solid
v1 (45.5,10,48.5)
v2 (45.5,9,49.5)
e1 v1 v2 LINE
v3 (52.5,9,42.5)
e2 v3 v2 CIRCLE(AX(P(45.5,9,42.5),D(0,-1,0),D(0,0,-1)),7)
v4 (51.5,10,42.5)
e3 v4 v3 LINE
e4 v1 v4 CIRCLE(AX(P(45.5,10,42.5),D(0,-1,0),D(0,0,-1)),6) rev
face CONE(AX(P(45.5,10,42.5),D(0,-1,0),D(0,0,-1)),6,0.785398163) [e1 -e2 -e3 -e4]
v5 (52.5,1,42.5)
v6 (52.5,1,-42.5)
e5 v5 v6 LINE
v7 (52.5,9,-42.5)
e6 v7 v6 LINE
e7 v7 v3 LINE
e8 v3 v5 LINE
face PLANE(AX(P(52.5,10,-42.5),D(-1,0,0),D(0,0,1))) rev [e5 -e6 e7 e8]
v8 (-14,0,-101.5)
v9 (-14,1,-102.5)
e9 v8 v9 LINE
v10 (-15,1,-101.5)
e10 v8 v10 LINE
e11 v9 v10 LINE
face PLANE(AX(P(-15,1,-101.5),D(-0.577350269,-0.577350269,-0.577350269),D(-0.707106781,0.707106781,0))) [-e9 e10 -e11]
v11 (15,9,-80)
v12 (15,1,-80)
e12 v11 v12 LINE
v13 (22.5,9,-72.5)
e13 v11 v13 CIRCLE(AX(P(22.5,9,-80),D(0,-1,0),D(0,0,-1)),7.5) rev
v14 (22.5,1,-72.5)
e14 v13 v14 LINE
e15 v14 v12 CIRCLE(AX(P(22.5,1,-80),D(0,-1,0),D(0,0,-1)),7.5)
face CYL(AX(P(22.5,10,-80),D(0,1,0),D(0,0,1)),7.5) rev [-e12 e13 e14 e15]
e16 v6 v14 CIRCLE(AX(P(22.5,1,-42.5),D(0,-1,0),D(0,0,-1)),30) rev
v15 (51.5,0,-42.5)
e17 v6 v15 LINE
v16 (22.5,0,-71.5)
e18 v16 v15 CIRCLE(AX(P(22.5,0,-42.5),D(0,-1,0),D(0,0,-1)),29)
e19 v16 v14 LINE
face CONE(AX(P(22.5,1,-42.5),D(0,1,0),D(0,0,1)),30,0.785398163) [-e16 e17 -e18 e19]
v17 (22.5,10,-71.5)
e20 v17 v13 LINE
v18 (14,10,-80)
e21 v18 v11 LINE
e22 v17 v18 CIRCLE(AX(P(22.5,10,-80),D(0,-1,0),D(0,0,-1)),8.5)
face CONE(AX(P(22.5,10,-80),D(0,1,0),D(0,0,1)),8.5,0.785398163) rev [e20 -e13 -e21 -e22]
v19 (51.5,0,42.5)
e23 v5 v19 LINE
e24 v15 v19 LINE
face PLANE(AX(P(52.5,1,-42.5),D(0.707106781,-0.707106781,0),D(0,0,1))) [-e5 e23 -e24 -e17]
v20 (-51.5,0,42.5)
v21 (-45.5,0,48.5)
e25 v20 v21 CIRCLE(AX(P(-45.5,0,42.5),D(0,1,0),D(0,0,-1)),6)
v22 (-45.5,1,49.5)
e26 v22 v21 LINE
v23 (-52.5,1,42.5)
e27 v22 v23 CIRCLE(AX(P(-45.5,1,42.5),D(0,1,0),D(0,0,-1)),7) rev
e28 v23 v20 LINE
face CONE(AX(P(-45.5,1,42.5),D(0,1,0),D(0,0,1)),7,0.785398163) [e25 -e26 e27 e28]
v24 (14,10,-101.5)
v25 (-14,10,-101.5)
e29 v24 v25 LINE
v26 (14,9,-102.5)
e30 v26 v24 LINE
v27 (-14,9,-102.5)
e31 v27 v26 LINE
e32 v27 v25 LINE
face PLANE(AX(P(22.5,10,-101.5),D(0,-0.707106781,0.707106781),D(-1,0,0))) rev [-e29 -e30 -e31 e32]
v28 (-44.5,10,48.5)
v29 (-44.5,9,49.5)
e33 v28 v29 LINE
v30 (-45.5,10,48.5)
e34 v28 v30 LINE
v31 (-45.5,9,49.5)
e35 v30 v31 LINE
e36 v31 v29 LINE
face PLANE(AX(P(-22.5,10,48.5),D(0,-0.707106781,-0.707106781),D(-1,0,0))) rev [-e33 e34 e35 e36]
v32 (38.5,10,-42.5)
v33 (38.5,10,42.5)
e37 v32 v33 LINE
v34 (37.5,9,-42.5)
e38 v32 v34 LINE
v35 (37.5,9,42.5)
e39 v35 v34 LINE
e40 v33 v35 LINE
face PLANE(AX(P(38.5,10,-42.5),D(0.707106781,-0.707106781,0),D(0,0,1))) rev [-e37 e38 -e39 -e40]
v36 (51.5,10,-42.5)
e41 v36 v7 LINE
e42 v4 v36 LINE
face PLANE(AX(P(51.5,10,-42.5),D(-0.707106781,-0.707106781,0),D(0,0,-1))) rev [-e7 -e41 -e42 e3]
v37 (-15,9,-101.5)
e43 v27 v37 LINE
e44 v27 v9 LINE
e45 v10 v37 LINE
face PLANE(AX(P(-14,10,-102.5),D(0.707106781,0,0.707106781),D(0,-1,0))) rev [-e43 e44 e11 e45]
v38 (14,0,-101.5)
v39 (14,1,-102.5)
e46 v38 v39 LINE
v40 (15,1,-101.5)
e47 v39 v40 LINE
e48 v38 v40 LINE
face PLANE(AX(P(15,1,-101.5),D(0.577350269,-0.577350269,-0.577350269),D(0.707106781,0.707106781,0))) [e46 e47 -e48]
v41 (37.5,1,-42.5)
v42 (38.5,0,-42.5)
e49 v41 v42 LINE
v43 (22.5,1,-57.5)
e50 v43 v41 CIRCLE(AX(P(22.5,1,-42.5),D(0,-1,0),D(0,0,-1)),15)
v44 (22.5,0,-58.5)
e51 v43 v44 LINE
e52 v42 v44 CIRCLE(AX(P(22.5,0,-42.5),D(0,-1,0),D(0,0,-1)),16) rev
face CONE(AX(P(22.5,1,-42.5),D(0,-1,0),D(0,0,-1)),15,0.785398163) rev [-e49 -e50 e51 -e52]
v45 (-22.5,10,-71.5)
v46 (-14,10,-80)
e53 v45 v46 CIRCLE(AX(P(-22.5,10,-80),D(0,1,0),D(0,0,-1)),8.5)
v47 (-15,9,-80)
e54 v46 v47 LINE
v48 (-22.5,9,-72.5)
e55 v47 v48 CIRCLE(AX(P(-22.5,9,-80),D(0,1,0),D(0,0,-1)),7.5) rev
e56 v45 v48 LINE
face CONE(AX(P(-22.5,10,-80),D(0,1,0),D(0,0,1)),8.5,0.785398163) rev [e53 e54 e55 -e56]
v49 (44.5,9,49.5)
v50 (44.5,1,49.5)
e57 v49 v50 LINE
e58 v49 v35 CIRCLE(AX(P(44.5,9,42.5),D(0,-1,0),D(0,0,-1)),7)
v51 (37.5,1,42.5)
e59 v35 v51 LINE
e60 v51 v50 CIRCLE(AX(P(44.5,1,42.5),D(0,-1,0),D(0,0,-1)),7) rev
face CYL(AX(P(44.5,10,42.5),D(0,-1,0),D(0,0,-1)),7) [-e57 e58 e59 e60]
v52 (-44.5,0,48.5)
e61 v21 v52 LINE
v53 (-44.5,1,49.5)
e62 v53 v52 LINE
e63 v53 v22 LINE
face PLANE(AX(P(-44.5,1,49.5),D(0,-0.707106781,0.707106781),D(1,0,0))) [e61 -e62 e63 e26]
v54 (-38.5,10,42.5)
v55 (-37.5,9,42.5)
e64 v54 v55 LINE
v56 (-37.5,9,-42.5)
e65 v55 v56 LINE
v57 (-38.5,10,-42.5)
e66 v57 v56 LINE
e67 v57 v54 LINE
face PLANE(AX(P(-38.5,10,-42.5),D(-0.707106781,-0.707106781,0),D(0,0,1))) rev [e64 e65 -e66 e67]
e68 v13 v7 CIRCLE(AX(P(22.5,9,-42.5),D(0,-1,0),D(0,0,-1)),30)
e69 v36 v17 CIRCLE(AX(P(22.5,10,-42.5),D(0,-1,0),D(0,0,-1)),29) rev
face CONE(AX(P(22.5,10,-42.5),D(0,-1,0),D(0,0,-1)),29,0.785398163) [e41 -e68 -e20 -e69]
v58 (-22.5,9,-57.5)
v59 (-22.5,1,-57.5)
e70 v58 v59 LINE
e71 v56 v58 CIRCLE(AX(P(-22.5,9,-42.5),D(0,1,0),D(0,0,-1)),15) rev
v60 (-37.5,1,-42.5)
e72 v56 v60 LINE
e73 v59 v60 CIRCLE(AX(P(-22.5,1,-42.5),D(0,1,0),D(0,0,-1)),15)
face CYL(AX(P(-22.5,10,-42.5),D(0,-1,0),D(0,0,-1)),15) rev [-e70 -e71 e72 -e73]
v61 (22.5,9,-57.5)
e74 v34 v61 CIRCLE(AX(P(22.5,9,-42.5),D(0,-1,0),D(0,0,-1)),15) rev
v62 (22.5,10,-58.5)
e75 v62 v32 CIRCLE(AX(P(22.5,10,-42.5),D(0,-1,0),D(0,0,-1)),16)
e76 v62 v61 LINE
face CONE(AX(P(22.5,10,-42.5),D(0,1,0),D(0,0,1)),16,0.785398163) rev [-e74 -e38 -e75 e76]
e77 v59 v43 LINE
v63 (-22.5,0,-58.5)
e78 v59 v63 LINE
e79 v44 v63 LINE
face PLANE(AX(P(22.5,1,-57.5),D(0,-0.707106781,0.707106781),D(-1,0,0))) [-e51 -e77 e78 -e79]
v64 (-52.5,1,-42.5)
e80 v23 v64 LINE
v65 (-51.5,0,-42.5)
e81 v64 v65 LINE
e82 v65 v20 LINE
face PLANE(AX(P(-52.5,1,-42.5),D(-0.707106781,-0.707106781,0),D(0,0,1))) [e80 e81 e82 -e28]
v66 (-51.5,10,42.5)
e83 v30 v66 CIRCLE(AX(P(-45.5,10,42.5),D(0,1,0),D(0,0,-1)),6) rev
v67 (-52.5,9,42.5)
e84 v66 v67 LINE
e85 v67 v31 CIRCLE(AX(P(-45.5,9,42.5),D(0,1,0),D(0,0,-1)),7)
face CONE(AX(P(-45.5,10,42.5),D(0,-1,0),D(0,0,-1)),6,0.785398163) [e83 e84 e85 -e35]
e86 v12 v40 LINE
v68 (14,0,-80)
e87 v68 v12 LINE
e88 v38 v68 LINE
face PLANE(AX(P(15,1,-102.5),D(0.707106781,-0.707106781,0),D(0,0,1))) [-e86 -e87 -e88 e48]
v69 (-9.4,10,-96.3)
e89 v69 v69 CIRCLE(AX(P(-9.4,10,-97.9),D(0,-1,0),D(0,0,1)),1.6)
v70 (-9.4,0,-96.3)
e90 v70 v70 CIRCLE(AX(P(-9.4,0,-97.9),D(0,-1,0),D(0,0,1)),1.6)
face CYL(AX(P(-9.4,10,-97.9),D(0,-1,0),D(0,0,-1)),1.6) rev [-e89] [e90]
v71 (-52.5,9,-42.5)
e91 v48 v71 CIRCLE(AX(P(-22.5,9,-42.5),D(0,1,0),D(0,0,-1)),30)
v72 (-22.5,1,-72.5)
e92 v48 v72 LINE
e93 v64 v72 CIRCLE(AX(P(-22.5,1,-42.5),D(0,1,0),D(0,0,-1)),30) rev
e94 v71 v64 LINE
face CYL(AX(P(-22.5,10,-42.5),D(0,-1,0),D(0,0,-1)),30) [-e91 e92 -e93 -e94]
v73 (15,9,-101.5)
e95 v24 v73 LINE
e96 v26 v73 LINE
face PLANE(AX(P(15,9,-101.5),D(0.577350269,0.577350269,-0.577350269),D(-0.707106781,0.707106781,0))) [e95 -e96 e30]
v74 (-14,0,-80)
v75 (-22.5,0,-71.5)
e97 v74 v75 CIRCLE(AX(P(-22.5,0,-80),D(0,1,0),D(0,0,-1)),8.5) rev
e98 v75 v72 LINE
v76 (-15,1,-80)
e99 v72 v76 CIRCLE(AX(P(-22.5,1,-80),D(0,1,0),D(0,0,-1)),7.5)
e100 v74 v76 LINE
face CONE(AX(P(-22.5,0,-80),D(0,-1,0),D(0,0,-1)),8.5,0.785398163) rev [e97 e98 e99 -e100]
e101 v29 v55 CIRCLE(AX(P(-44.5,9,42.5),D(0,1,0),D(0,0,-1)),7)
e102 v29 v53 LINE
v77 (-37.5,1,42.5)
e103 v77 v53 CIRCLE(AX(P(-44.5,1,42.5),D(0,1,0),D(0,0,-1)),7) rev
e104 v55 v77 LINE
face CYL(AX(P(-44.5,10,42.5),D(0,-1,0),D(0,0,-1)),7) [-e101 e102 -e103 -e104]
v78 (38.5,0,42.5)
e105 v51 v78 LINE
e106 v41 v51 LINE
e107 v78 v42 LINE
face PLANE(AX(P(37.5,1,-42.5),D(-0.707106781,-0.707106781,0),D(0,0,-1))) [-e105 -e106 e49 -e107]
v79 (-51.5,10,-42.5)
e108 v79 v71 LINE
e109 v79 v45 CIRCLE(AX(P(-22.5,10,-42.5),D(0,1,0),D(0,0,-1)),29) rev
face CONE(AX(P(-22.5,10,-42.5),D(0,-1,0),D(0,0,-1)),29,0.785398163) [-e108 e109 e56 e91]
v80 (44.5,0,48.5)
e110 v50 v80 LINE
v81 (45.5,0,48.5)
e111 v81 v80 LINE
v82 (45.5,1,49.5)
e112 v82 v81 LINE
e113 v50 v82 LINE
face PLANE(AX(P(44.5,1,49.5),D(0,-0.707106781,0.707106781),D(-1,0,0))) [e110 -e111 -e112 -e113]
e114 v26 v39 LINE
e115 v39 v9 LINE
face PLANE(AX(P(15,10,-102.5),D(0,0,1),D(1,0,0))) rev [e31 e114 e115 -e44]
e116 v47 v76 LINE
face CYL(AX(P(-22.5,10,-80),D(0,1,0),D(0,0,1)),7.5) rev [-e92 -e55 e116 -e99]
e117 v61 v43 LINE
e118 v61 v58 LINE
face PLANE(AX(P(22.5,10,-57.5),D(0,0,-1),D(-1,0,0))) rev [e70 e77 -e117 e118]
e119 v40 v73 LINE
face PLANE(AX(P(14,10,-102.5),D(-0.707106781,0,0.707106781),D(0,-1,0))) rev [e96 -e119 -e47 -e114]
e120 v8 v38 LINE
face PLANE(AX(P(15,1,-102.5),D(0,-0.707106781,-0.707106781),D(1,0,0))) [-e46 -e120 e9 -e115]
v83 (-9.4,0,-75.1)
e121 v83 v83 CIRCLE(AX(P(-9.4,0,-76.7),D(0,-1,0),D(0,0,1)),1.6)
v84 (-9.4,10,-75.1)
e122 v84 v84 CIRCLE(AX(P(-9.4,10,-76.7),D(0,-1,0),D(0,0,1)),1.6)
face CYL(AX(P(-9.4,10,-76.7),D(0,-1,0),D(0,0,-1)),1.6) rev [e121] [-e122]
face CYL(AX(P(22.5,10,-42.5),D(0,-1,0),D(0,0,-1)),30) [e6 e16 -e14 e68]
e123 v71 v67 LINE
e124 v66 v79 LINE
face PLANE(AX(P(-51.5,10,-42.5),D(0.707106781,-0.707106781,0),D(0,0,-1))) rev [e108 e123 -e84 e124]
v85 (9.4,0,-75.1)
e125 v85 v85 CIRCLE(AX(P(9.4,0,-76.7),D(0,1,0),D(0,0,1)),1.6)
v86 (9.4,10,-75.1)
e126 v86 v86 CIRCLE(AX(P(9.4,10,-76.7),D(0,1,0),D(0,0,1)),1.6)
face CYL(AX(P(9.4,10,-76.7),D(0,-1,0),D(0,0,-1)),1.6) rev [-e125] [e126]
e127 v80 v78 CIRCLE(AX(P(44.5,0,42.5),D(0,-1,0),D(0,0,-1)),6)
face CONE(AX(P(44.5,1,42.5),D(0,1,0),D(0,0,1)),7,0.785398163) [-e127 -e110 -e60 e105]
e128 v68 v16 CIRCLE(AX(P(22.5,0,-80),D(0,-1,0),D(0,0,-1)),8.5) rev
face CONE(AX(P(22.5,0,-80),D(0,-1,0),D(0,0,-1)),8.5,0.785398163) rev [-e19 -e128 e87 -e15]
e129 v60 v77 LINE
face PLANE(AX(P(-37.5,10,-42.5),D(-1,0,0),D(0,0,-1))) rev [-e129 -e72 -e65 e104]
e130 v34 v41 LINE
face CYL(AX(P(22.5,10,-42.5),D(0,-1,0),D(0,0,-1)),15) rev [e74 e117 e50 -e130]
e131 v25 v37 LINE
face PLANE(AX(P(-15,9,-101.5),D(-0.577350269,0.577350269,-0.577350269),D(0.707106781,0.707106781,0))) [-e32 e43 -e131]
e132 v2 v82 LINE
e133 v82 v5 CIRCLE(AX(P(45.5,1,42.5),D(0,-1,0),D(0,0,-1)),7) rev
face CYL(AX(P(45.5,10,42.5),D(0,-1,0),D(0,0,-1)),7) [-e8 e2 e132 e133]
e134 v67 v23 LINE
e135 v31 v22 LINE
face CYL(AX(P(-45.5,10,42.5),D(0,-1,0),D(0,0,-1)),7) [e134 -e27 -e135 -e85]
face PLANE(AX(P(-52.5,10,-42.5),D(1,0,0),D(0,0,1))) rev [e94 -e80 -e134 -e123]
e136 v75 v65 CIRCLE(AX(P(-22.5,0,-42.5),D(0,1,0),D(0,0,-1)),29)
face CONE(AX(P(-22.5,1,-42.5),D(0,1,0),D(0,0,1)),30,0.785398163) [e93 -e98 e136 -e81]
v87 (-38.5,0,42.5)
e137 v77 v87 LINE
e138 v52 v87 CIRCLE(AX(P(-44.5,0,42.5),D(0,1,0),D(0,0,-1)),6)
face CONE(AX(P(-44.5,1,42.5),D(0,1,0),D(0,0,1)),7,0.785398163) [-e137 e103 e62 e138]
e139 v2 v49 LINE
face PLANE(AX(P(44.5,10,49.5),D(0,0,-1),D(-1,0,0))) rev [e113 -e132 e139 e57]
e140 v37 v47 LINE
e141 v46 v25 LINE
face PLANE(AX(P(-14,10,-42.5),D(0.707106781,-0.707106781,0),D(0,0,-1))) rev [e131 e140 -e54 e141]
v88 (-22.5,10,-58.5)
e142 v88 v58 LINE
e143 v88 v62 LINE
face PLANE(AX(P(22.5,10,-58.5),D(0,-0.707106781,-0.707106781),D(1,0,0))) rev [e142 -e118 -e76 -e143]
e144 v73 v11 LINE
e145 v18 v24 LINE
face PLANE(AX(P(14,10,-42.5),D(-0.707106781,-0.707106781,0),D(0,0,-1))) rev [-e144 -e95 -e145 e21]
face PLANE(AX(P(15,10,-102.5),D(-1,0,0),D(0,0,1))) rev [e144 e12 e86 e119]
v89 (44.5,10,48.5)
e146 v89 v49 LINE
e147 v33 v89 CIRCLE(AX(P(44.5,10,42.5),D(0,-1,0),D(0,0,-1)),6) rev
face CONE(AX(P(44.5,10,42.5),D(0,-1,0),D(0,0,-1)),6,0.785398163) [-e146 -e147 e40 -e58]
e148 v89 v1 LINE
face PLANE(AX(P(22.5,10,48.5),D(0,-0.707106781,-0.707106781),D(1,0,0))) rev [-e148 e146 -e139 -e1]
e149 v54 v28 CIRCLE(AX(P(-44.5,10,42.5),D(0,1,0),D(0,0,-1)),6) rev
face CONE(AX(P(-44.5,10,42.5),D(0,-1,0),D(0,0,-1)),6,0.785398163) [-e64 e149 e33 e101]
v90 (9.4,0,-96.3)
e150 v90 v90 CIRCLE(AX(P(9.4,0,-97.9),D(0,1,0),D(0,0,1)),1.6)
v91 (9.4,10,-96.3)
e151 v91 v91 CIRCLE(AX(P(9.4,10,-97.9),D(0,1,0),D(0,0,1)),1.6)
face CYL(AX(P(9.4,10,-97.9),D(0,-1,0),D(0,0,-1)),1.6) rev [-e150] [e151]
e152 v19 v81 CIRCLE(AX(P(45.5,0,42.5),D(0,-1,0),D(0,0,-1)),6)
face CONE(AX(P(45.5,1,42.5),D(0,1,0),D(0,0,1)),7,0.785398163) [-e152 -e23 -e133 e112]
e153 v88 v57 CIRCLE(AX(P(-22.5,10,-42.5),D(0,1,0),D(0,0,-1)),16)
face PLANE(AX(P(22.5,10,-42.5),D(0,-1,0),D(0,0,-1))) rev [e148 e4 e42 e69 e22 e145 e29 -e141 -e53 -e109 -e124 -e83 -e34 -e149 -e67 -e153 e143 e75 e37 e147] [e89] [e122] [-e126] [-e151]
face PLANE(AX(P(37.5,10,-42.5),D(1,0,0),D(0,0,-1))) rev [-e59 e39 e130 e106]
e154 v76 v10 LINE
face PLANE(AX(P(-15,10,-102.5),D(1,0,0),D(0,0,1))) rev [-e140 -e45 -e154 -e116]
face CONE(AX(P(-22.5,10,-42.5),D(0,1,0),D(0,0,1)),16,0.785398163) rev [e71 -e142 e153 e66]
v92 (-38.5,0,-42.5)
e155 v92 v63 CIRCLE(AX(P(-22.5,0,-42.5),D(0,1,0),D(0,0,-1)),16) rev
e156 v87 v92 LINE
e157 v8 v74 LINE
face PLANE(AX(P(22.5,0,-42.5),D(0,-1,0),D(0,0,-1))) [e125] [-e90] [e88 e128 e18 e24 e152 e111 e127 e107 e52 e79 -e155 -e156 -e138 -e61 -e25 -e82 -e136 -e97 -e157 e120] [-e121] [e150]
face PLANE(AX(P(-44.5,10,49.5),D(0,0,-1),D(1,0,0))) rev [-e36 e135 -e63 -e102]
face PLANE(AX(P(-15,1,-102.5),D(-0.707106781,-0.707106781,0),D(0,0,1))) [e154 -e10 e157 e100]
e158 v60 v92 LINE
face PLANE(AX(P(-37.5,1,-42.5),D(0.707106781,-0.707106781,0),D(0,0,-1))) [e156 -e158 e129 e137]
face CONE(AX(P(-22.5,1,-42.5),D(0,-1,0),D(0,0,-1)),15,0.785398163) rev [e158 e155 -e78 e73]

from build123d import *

# Parameters (mm, degrees)
SKETCH1_R           = 1.6
BOSS_EXTRUDE1_DEPTH = 10
FILLET1_R           = 7.5
CHAMFER1_SIZE       = 1


with BuildPart() as part:
    # Sketch1 → Boss-Extrude1 (new body)
    with BuildSketch(Plane(origin=(0, 0, 0), x_dir=(1, 0, 0), z_dir=(0, 1, 0))):
        with BuildLine():
            Line((22.5, 57.5), (0, 57.5))
            Line((0, 57.5), (0, 102.5))
            Line((0, 102.5), (15, 102.5))
            Line((15, 102.5), (15, 72.5))
            Line((15, 72.5), (22.5, 72.5))
            ThreePointArc((22.5, 72.5), (43.713203436, 63.713203436), (52.5, 42.5))
            Line((52.5, 42.5), (52.5, -42.5))
            ThreePointArc((52.5, -42.5), (50.449747468, -47.449747468), (45.5, -49.5))
            Line((45.5, -49.5), (44.5, -49.5))
            ThreePointArc((44.5, -49.5), (39.550252532, -47.449747468), (37.5, -42.5))
            Line((37.5, -42.5), (37.5, 42.5))
            ThreePointArc((37.5, 42.5), (33.106601718, 53.106601718), (22.5, 57.5))
        make_face()
        with Locations(Location((9.4, 97.9, 0), (0, 0, 270))):
            Circle(SKETCH1_R, mode=Mode.SUBTRACT)
        with Locations(Location((9.4, 76.7, 0), (0, 0, 270))):
            Circle(SKETCH1_R, mode=Mode.SUBTRACT)
    extrude(amount=BOSS_EXTRUDE1_DEPTH)

    # Fillet1
    fillet1_edges = [part.edges().sort_by_distance(p)[0] for p in [
        (15, 5, -72.5),
    ]]
    fillet(fillet1_edges, radius=FILLET1_R - 0.0001)  # a hair under: the kernel refuses the full size

    # Chamfer1
    chamfer1_edges = [part.edges().sort_by_distance(p)[0] for p in [
        (7.5, 0, -102.5),
        (33.106601718, 10, -53.106601718),
        (43.713203436, 0, -63.713203436),
        (52.5, 0, 0),
        (50.449747468, 0, 47.449747468),
        (45, 0, 49.5),
        (39.550252532, 0, 47.449747468),
        (37.5, 0, 0),
        (33.106601718, 0, -53.106601718),
        (11.25, 0, -57.5),
        (37.5, 10, 0),
        (15, 5, -102.5),
        (39.550252532, 10, 47.449747468),
        (45, 10, 49.5),
        (50.449747468, 10, 47.449747468),
        (52.5, 10, 0),
        (43.713203436, 10, -63.713203436),
        (15, 0, -91.24995),
        (15, 10, -91.24995),
        (17.196669852, 0, -74.696669852),
        (17.196669852, 10, -74.696669852),
        (7.5, 10, -102.5),
        (11.25, 10, -57.5),
    ]]
    chamfer(chamfer1_edges, length=CHAMFER1_SIZE)

    # Mirror1: part across plane


with BuildPart() as part_1:
    add(part.part)
    add(part.part.mirror(Plane(origin=(0, 10, -57.5), x_dir=(0, 0, 1), z_dir=(1, 0, 0))))


solid = part_1.part
